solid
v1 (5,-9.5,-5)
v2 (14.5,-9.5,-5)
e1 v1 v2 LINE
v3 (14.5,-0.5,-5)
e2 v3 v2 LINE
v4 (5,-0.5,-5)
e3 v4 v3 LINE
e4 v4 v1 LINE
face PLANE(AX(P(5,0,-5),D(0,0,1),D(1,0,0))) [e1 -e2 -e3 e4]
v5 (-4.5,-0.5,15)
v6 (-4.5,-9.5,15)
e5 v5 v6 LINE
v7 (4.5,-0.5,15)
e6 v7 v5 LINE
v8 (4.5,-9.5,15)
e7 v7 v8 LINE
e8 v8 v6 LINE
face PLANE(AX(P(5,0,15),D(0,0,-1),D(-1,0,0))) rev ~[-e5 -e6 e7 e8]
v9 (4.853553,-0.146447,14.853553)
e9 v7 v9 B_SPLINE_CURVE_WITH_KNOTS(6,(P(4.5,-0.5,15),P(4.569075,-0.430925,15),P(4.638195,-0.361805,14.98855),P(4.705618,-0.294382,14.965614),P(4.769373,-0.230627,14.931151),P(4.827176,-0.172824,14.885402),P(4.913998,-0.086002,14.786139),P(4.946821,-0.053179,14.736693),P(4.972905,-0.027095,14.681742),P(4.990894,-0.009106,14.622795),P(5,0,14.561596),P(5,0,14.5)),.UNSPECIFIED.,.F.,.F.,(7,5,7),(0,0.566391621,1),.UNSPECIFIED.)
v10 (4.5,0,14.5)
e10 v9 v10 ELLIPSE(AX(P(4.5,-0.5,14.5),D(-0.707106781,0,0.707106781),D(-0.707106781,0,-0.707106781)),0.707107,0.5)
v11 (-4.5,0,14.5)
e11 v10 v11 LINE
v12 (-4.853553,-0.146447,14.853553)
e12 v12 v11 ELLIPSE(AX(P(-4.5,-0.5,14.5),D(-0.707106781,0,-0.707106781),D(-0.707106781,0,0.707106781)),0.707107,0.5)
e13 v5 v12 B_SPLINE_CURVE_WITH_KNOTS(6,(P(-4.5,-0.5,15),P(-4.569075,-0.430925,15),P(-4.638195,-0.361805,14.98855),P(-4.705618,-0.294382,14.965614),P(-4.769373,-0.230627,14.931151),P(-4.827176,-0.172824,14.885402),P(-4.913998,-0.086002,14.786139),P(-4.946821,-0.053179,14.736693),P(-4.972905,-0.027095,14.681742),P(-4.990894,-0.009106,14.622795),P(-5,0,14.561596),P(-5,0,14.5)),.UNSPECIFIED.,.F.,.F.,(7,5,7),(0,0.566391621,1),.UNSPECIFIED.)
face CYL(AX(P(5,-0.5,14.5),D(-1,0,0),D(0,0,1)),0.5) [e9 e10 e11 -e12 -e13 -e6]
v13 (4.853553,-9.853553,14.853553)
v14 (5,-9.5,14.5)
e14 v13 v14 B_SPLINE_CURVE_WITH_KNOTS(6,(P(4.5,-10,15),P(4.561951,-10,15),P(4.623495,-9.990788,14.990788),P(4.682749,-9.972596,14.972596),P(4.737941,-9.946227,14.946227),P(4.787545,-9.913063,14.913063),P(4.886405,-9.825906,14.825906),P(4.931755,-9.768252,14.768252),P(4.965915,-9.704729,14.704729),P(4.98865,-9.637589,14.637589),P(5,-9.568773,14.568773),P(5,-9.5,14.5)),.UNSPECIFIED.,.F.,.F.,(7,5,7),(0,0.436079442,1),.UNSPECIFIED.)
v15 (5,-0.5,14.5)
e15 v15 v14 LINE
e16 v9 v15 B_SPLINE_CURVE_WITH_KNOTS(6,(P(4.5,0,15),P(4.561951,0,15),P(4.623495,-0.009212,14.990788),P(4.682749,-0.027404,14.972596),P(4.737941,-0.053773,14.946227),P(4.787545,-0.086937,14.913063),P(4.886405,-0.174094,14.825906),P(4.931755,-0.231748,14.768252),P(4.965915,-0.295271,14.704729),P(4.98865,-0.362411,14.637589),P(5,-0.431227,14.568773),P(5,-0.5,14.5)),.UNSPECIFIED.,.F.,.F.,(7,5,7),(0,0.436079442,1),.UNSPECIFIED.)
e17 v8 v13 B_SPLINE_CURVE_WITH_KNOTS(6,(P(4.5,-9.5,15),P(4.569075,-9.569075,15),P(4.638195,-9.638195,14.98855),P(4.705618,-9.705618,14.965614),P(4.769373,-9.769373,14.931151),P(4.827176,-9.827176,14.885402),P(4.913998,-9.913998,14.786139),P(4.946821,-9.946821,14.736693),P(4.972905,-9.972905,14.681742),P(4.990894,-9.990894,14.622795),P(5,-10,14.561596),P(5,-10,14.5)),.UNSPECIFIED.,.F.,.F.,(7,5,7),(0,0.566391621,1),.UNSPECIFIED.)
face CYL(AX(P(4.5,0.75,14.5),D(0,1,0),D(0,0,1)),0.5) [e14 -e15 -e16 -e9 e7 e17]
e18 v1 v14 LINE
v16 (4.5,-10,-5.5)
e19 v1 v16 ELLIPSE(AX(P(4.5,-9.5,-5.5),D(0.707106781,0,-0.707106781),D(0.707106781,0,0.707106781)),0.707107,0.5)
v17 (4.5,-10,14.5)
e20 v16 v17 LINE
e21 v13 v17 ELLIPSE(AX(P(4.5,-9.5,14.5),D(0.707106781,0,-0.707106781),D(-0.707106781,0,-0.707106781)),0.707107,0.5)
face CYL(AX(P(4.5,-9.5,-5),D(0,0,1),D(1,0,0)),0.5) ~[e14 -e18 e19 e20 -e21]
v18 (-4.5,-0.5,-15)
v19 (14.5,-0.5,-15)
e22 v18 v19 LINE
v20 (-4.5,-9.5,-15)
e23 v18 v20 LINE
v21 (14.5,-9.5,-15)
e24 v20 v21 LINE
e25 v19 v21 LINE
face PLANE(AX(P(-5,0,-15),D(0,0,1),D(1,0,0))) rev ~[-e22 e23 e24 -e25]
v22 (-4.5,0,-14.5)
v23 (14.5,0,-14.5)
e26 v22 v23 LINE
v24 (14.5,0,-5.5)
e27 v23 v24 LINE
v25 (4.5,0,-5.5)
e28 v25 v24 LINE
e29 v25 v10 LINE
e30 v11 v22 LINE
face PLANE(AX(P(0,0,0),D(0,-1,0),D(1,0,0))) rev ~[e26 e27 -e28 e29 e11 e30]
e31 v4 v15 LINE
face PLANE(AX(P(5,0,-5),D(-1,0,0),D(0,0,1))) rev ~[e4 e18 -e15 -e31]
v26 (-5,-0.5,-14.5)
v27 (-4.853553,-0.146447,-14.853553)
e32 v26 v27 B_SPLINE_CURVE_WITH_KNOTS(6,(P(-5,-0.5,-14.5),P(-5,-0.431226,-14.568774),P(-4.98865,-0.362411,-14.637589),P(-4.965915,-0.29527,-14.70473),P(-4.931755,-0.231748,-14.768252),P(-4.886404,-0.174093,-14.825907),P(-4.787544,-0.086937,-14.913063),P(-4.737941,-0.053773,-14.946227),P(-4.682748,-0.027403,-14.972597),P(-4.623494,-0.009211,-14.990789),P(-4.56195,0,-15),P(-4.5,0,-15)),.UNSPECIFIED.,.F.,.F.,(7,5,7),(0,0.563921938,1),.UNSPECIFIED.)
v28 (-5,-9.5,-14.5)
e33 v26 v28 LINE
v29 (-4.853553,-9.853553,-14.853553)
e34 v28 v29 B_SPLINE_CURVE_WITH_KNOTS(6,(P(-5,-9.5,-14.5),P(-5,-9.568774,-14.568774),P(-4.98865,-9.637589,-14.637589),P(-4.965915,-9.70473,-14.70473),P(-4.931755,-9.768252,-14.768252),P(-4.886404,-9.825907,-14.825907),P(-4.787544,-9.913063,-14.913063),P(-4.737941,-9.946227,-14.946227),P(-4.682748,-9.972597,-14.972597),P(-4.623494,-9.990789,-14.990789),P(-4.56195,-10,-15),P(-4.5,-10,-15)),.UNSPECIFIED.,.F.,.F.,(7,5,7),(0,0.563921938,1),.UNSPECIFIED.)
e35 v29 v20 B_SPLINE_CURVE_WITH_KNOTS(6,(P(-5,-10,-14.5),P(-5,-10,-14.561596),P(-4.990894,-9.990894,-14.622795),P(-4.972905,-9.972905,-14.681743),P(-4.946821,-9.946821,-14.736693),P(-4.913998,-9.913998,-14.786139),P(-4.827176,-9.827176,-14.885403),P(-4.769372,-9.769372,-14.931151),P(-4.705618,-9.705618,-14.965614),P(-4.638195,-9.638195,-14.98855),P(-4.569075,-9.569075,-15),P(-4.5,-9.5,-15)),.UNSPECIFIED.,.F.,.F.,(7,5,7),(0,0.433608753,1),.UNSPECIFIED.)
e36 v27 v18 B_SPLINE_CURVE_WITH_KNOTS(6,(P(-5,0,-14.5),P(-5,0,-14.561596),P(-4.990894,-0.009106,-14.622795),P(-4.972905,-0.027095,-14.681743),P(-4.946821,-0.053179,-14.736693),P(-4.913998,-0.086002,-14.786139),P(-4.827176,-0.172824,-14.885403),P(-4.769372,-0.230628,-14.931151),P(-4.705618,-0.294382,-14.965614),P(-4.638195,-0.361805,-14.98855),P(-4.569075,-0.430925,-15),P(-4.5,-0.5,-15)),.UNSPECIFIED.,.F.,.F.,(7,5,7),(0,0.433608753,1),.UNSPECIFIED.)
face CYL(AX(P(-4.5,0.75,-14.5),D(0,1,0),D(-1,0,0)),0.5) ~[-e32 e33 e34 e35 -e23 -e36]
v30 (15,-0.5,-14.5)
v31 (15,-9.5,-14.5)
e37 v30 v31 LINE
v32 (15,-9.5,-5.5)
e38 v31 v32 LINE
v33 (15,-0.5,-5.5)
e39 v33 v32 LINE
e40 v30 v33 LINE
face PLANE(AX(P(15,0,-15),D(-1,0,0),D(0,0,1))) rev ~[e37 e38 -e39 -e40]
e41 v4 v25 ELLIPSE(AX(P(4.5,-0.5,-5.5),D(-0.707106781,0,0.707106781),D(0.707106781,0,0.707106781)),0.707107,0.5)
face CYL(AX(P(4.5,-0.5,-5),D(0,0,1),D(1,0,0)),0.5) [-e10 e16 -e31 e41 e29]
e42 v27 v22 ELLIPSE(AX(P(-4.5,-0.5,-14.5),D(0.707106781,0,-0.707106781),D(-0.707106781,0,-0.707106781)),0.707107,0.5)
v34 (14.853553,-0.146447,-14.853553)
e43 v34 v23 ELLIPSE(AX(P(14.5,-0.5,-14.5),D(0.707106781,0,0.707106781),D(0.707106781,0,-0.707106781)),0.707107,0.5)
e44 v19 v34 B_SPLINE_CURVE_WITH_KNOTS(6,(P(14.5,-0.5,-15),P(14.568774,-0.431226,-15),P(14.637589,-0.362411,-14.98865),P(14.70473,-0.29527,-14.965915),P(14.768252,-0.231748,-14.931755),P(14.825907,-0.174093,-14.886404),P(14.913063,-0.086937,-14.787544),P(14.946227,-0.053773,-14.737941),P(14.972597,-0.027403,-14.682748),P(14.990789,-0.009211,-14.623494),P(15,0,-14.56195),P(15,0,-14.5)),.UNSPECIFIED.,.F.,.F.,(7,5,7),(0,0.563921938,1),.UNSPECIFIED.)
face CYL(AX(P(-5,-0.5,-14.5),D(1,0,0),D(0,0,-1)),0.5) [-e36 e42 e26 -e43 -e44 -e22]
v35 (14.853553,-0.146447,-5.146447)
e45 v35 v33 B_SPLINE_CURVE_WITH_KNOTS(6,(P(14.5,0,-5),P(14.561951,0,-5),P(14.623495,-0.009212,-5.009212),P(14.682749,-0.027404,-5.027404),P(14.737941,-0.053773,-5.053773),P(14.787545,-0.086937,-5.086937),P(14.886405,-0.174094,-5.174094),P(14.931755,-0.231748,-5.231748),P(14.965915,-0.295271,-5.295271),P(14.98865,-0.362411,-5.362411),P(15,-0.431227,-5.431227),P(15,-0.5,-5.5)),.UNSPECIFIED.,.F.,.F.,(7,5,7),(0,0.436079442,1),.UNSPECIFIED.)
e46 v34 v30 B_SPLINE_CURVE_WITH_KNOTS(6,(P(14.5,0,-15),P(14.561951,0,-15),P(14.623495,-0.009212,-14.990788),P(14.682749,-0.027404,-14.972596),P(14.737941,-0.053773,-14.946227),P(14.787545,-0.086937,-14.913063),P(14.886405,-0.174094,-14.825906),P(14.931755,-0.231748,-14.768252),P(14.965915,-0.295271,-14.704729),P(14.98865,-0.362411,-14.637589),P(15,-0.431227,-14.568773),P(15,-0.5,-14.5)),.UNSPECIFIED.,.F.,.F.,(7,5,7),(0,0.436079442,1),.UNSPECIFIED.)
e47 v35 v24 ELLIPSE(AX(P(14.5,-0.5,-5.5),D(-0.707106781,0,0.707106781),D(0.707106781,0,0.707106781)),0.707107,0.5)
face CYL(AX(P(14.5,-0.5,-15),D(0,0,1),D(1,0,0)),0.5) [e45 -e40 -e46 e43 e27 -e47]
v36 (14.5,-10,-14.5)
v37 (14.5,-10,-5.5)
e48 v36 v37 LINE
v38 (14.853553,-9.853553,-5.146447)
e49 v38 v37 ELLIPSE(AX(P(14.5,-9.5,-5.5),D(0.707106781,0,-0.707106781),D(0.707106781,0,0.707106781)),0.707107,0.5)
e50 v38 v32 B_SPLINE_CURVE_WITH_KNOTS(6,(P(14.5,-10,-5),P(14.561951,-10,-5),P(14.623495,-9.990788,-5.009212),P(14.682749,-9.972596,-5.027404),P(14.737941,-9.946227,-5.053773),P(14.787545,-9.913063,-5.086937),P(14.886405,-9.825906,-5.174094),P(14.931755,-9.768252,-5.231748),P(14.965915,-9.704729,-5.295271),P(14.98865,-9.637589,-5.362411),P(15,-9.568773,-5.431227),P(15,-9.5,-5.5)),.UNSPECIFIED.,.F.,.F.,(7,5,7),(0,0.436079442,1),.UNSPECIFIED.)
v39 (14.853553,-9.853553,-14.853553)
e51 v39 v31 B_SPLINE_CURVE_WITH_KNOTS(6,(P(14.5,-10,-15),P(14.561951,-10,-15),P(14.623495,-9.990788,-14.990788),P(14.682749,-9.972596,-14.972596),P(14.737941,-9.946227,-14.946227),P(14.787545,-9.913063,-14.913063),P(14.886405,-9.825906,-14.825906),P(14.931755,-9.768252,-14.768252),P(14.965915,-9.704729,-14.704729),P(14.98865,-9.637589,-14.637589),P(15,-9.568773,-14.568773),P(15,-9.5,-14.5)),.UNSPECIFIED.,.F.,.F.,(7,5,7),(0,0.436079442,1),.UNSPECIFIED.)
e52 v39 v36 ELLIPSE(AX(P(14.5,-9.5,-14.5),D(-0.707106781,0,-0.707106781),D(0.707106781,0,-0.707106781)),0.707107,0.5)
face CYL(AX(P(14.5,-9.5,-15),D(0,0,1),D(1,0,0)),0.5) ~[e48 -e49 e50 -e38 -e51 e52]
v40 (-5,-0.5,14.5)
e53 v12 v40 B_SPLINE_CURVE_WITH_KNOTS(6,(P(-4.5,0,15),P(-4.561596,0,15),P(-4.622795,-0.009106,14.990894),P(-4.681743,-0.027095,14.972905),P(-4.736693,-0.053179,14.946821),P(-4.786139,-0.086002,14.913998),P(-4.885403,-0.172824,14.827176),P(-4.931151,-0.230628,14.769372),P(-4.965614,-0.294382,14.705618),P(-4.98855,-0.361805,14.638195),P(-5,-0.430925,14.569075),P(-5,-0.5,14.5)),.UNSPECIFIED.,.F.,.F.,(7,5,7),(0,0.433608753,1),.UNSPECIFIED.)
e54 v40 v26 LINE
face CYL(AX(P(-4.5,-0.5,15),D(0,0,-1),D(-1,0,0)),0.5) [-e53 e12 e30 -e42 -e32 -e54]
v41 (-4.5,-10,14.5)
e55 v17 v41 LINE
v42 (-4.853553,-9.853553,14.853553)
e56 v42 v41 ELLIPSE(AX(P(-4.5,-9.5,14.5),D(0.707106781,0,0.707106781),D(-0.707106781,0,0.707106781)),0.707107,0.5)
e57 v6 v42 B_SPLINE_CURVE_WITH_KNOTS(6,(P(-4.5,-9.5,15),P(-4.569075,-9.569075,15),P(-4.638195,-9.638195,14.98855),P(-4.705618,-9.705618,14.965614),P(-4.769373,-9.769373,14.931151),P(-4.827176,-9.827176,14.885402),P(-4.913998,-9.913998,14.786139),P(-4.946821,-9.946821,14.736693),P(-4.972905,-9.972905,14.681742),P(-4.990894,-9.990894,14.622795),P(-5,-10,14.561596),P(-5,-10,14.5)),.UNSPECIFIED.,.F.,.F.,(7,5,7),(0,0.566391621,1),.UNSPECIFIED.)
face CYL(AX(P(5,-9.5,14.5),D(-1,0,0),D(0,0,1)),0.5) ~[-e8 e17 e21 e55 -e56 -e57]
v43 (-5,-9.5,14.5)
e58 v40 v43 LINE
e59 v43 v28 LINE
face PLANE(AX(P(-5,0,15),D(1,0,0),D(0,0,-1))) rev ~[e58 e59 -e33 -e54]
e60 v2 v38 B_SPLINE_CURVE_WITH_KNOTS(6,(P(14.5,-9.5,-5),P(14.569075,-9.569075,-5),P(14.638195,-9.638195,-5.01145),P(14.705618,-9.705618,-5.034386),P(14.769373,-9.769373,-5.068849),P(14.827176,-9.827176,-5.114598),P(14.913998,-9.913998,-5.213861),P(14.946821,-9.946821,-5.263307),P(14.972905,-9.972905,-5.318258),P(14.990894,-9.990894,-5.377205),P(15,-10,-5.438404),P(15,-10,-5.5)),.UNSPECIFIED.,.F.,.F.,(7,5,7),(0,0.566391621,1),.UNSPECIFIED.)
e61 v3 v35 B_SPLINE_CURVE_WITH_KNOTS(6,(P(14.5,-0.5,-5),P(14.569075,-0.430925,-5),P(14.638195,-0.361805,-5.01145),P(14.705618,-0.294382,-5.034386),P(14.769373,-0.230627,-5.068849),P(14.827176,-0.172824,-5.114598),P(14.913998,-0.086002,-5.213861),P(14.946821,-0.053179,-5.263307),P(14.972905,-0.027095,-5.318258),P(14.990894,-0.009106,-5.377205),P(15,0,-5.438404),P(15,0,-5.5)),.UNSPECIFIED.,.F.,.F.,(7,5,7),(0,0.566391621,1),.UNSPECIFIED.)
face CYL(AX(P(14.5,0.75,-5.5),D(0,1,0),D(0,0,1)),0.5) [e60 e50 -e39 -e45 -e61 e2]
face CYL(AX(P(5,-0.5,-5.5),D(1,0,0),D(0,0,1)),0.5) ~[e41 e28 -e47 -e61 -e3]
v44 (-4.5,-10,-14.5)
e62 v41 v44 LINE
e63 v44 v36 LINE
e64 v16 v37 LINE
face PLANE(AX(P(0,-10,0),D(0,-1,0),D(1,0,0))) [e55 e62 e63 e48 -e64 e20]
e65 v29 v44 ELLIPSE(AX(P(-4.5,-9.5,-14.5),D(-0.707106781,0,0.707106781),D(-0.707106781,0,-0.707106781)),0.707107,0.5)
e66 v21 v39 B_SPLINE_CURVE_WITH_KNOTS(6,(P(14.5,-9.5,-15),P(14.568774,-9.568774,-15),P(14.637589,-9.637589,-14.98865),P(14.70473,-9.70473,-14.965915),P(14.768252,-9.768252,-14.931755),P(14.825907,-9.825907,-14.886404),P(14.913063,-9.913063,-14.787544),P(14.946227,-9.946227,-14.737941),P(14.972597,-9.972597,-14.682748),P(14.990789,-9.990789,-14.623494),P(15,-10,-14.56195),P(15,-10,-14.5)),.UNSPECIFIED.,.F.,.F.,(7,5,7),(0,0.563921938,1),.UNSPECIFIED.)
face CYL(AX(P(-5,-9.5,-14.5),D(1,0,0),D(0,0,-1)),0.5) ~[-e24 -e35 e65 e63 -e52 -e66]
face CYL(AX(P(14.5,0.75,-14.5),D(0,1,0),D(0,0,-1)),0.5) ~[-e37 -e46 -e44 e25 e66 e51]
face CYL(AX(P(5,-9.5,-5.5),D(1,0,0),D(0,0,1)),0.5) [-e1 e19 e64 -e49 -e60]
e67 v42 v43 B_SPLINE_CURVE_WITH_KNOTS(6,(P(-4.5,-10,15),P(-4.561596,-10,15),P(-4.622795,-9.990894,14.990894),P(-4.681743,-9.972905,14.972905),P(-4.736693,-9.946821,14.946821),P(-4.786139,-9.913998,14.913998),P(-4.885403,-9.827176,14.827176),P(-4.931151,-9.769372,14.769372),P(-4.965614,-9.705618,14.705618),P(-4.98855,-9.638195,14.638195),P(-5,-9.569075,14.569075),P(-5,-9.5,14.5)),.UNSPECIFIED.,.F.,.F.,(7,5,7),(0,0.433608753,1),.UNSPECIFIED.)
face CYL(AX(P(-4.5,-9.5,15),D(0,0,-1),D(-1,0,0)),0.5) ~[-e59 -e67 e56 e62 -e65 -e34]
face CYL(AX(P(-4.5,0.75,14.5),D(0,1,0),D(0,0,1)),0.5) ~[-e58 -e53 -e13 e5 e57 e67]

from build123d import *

# Parameters (mm, degrees)
F0_W        = 10
F0_H        = 10
F1_DEPTH    = 10
F2_R        = 0.5
F3_T1_DEPTH = 11.5


# Not quite as in the source:
# - a fillet or chamfer that OpenCascade refuses, or shapes differently, is made with other operations: its cross-section is extruded or revolved along the edge and cut away or added


with BuildPart() as f1:
    # F0 (on Front) → F1 (new body)
    with BuildSketch(Plane.XZ):
        Polygon((5, 15), (-5, 15), (-5, -15), (5, -15), (5, -5), align=None)
        with Locations((10, -10)):
            Rectangle(F0_W, F0_H)
    extrude(amount=F1_DEPTH)

    # F2
    f2_edges = [f1.edges().sort_by_distance(p)[0] for p in [
        (0, -10, 15),
        (-5, -10, 0),
        (5, -10, -15),
        (15, -10, -10),
        (10, -10, -5),
        (5, -10, 5),
        (0, 0, 15),
        (-5, 0, 0),
        (5, 0, -15),
        (15, 0, -10),
        (10, 0, -5),
        (5, 0, 5),
    ]]
    fillet(f2_edges, radius=F2_R)

    # F3: fillet of radius 0.5 on 11 edges, made by hand

    # F3_s2 → F3_t1 (cut)
    with BuildSketch(Plane.XZ.offset(-0.75)):
        with BuildLine():
            ThreePointArc((-5, -14.5), (-4.8535533906, -14.8535533906), (-4.5, -15))
            Line((-4.5, -15), (-5, -15))
            Line((-5, -15), (-5, -14.5))
        make_face()
        with BuildLine():
            ThreePointArc((14.5, -15), (14.8535533906, -14.8535533906), (15, -14.5))
            Line((15, -14.5), (15, -15))
            Line((15, -15), (14.5, -15))
        make_face()
        with BuildLine():
            ThreePointArc((4.5, 15), (4.8535533906, 14.8535533906), (5, 14.5))
            Line((5, 14.5), (5, 15))
            Line((5, 15), (4.5, 15))
        make_face()
        with BuildLine():
            ThreePointArc((-4.5, 15), (-4.8535533906, 14.8535533906), (-5, 14.5))
            Line((-5, 14.5), (-5, 15))
            Line((-5, 15), (-4.5, 15))
        make_face()
        with BuildLine():
            ThreePointArc((14.5, -5), (14.8535533906, -5.1464466094), (15, -5.5))
            Line((15, -5.5), (15, -5))
            Line((15, -5), (14.5, -5))
        make_face()
    extrude(amount=F3_T1_DEPTH, mode=Mode.SUBTRACT)


solid = f1.part
